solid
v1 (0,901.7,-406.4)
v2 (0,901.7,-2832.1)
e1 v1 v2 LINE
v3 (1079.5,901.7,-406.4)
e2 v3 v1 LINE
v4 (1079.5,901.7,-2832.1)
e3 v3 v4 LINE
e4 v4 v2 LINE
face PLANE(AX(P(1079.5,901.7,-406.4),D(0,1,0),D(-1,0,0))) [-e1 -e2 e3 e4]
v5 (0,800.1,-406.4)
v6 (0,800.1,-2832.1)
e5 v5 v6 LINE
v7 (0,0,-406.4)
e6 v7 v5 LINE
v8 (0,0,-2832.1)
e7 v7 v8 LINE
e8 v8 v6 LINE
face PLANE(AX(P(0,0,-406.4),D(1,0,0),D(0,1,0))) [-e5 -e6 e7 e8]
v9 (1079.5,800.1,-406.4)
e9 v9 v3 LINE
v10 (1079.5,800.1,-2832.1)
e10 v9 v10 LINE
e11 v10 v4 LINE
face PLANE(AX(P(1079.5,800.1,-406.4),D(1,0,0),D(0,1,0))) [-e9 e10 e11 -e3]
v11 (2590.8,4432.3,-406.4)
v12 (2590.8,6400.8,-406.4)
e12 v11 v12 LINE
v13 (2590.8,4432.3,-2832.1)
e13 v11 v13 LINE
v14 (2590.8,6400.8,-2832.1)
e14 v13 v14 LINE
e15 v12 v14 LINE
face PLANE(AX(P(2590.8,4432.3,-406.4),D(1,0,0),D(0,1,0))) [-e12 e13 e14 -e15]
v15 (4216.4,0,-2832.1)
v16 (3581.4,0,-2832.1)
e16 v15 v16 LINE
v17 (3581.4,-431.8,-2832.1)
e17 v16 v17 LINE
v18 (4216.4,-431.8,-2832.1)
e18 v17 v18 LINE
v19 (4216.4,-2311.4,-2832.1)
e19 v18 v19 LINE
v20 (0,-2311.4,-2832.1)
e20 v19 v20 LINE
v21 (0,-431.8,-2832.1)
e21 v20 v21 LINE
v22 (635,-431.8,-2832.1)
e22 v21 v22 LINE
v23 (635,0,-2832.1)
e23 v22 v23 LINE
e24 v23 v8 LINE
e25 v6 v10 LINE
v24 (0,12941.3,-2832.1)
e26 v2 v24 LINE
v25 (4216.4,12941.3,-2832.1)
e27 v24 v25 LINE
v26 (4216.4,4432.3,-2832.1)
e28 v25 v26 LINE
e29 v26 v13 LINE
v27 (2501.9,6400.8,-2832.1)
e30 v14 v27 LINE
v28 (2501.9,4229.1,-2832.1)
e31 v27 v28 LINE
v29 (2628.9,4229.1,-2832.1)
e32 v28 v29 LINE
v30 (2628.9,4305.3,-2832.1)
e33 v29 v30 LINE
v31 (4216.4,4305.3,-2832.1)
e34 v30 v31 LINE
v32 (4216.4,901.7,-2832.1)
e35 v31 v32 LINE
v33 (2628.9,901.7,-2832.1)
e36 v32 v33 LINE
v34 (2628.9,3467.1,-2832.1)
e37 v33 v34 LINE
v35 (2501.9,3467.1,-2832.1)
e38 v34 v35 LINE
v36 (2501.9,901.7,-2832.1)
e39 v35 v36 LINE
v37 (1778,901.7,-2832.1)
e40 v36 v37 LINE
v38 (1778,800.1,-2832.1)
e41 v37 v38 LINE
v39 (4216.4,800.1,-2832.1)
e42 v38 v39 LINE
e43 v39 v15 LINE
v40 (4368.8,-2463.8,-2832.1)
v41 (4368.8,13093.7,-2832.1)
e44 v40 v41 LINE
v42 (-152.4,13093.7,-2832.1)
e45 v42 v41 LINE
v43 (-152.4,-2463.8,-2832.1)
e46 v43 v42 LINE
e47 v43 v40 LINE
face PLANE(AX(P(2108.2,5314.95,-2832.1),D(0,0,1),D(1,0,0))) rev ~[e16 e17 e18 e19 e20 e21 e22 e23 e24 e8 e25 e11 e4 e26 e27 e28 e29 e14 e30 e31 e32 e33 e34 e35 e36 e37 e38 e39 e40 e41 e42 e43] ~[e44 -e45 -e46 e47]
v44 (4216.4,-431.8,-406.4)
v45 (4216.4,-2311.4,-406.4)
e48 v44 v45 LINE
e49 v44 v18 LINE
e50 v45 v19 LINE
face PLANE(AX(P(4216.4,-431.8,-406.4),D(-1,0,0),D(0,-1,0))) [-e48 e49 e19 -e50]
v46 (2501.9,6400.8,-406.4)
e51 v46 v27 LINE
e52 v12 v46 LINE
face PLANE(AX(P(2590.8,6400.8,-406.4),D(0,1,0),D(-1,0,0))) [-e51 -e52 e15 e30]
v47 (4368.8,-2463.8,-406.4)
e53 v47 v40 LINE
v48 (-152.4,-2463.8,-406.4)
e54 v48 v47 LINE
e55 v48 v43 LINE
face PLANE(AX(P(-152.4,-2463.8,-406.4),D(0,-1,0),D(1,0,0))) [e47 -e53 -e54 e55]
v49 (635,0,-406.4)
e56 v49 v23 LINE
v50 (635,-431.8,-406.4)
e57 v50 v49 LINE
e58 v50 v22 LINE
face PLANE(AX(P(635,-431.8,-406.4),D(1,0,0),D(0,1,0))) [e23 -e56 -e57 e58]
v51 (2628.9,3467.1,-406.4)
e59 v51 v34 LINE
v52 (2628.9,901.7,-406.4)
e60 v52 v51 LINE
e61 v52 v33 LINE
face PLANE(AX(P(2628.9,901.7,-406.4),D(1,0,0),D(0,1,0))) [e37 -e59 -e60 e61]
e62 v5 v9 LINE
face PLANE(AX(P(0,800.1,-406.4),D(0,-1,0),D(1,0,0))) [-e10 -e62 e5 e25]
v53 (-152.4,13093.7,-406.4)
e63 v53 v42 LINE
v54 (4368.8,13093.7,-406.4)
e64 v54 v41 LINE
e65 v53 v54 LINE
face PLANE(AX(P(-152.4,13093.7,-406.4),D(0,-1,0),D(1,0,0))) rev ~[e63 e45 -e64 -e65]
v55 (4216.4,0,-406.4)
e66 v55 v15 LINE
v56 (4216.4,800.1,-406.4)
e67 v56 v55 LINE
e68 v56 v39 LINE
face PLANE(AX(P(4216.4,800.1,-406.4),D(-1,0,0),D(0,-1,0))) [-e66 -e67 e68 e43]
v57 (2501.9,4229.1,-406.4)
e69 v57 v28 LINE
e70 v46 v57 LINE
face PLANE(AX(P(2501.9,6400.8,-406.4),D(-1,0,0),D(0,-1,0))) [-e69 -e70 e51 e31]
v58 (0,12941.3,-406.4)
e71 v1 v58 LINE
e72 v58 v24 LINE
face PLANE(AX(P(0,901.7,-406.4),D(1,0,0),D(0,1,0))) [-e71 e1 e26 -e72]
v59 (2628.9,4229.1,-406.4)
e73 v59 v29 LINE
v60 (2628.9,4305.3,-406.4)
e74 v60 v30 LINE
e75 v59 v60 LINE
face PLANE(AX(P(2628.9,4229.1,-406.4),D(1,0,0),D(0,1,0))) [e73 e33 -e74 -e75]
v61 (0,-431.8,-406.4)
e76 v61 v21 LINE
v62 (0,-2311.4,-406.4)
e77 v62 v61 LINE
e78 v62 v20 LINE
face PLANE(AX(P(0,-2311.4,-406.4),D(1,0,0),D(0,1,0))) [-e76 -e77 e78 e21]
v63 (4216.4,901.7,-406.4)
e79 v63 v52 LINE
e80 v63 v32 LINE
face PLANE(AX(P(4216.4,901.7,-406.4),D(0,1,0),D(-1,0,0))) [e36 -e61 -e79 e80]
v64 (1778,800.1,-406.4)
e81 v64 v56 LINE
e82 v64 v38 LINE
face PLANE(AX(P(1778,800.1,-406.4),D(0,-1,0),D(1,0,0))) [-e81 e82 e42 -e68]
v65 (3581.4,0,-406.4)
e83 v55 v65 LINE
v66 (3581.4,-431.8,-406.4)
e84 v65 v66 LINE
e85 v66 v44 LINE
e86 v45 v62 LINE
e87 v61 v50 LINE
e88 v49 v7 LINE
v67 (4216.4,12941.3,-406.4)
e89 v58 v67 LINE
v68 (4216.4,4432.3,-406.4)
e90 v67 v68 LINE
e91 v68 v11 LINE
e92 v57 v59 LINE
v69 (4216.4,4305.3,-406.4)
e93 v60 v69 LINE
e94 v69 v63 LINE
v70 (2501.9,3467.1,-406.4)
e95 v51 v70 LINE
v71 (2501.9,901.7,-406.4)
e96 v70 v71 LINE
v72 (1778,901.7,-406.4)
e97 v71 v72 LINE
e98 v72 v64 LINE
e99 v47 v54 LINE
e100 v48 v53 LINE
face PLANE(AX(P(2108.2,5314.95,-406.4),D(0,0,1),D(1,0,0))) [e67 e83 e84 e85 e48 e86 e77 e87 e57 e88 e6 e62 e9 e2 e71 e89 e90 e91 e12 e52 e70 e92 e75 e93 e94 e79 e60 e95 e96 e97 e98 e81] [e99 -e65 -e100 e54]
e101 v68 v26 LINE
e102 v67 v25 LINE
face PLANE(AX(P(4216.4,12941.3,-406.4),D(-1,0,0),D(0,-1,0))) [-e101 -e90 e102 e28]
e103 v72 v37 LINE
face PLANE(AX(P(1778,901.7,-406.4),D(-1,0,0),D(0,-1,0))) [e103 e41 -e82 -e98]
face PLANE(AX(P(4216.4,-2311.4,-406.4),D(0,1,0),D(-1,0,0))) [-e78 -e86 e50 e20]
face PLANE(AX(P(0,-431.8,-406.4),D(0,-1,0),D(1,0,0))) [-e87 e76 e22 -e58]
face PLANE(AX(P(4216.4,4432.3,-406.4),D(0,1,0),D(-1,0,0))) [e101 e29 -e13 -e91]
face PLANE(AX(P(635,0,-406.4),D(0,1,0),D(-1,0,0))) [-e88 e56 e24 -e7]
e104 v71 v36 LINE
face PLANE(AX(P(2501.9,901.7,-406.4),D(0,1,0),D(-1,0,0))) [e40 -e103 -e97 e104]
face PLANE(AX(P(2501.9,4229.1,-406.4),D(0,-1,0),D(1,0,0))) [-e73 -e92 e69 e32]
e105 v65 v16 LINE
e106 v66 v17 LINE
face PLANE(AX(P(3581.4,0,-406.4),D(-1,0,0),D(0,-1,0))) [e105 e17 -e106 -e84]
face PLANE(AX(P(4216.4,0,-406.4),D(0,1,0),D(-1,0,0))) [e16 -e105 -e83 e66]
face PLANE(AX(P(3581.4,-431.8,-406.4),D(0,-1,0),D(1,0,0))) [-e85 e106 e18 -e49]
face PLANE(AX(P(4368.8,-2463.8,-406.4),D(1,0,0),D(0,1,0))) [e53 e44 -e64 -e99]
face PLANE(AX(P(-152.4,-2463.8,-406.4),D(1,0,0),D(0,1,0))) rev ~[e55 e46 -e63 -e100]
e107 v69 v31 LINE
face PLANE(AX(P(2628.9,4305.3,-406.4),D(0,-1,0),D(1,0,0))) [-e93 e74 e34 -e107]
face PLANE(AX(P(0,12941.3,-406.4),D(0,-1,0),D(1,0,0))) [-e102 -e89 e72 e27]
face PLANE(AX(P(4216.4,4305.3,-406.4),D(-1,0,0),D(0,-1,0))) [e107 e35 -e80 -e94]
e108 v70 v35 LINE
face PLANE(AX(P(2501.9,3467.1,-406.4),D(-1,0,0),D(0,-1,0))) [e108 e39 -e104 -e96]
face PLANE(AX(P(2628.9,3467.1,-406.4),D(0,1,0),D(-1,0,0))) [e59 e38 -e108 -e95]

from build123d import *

# Parameters (mm, degrees)
F1_W     = 4521.2
F1_H     = 15557.5
F2_DEPTH = 2425.7


# Not quite as in the source:
# - a feature names something its author has since deleted; it is built from what else it names


with BuildPart() as f2:
    # F1 (on offset) → F2 (new body)
    with BuildSketch(Plane.XY.offset(-406.4)):
        with Locations((2108.2, 5314.95)):
            Rectangle(F1_W, F1_H)
        Polygon((635, 0), (0, 0), (0, 800.1), (1079.5, 800.1), (1079.5, 901.7), (0, 901.7), (0, 12941.3), (4216.4, 12941.3), (4216.4, 4432.3), (2590.8, 4432.3), (2590.8, 6400.8), (2501.9, 6400.8), (2501.9, 4229.1), (2628.9, 4229.1), (2628.9, 4305.3), (4216.4, 4305.3), (4216.4, 901.7), (2628.9, 901.7), (2628.9, 3467.1), (2501.9, 3467.1), (2501.9, 901.7), (1778, 901.7), (1778, 800.1), (4216.4, 800.1), (4216.4, 0), (3581.4, 0), (3581.4, -431.8), (4216.4, -431.8), (4216.4, -2311.4), (0, -2311.4), (0, -431.8), (635, -431.8), align=None, mode=Mode.SUBTRACT)
    extrude(amount=-F2_DEPTH)


solid = f2.part
